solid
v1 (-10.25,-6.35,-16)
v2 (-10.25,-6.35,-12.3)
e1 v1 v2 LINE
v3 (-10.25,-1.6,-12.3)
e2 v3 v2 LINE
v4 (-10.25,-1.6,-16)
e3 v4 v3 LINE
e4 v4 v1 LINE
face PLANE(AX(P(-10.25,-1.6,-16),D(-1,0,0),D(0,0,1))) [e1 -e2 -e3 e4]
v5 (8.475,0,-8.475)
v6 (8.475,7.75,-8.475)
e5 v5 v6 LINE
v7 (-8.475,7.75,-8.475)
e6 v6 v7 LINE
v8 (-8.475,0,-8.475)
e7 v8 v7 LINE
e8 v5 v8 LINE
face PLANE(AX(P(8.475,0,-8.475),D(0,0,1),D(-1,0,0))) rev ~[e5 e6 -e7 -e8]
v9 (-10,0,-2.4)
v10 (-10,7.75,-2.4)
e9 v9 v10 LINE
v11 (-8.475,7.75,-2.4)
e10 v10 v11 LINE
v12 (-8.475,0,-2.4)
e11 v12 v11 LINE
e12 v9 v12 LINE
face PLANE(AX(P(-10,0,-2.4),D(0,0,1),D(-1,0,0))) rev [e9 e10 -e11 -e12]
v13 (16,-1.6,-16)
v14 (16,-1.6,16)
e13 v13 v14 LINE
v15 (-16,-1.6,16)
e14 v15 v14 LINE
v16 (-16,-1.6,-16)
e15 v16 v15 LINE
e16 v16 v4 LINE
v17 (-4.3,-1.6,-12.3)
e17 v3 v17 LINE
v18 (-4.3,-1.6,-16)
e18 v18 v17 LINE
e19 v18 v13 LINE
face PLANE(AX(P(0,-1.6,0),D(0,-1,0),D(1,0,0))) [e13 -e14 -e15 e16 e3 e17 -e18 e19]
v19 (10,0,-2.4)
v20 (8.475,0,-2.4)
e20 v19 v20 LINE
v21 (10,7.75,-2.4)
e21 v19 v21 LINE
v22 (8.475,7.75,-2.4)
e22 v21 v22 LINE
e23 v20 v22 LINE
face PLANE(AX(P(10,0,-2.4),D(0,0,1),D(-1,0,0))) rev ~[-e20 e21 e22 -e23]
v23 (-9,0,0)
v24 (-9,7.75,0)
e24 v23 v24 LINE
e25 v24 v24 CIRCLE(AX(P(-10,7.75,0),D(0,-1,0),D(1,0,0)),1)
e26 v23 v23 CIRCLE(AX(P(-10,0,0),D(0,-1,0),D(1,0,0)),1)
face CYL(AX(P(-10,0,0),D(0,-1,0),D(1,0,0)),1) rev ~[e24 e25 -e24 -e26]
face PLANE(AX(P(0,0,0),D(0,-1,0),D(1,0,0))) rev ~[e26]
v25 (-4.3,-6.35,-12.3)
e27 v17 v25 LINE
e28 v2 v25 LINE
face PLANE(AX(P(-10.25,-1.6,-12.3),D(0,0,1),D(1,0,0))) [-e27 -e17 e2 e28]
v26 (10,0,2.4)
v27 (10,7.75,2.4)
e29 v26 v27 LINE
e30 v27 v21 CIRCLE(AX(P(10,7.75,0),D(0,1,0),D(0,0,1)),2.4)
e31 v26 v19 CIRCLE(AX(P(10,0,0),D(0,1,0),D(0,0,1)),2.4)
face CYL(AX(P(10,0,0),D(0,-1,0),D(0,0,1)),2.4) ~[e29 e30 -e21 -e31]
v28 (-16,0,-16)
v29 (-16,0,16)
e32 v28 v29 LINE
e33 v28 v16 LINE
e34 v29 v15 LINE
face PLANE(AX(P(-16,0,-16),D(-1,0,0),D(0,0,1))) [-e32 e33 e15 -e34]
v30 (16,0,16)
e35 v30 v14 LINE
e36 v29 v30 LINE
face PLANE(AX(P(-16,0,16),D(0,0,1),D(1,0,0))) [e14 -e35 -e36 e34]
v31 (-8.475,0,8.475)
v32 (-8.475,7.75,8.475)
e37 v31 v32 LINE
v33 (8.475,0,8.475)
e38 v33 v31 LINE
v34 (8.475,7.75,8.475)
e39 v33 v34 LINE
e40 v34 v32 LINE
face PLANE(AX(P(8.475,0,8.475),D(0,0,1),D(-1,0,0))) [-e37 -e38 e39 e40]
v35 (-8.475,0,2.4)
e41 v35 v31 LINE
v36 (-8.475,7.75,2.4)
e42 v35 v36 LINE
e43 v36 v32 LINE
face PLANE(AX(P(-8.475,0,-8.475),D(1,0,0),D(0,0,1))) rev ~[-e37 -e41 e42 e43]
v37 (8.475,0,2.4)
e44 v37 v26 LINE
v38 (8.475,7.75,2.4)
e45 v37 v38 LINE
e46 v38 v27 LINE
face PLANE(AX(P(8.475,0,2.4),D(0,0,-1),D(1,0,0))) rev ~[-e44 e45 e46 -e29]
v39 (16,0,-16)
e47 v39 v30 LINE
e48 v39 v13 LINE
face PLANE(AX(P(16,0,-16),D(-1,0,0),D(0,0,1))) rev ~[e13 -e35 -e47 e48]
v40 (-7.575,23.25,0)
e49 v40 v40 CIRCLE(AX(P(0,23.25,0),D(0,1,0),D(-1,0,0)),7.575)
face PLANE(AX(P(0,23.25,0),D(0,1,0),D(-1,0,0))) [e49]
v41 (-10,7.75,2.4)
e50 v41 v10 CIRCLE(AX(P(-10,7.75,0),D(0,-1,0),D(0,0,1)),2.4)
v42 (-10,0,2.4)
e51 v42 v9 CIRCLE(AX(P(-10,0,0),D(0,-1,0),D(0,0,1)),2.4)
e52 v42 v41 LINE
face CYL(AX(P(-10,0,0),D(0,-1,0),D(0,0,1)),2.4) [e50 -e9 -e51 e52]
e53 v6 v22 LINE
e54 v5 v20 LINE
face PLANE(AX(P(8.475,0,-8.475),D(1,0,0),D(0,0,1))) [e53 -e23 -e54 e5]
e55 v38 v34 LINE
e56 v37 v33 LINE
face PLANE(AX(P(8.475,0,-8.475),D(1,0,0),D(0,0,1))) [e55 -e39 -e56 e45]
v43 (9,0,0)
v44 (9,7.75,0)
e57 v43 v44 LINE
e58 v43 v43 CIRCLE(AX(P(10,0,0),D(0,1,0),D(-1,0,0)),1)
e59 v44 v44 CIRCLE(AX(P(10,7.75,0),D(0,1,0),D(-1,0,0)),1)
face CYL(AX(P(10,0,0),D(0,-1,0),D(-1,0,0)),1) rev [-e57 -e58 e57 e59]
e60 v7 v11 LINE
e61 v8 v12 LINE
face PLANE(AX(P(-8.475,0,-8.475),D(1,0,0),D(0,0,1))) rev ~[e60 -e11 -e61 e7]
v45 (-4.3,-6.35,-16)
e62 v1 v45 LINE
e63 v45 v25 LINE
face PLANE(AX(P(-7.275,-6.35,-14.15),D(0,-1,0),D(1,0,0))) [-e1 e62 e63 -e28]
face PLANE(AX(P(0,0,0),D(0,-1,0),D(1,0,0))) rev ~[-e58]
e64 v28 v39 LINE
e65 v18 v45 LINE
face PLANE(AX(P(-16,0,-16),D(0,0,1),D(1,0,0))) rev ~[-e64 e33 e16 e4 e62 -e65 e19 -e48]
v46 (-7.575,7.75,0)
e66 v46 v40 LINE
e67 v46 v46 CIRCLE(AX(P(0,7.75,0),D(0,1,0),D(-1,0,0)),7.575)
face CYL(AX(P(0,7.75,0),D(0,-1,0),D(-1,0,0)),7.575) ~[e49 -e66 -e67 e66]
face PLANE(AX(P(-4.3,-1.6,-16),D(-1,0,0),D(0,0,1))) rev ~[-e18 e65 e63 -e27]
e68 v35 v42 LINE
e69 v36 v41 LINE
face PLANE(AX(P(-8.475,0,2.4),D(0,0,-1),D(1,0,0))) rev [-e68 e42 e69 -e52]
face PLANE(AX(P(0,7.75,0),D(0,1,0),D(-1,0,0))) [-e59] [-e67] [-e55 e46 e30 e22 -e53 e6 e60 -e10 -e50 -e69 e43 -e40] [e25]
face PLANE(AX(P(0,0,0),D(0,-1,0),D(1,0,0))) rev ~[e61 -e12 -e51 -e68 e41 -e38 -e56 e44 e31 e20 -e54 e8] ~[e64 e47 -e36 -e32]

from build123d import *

# Parameters (mm, degrees)
F0_W     = 32
F0_H     = 32
F1_DEPTH = 1.6
F2_W     = 5.95
F2_H     = 3.7
F3_DEPTH = 4.75
F4_W     = 16.95
F4_H     = 16.95
F5_DEPTH = 7.75
F6_R     = 7.575
F7_DEPTH = 15.5
F8_R     = 1
F9_DEPTH = 7.75


# Not quite as in the source:
# - a pattern or mirror of a feature is missing from the dataset's text; its kind, count and spacing are read off the source's solid


with BuildPart() as f1:
    # F0 (on Front) → F1 (new body)
    with BuildSketch(Plane.XZ):
        Rectangle(F0_W, F0_H)
    extrude(amount=F1_DEPTH)

    # F2 (on face) → F3 (join)
    with BuildSketch(Plane.XZ.offset(1.6)):
        with Locations((-7.275, -14.15)):
            Rectangle(F2_W, F2_H)
    extrude(amount=F3_DEPTH)

    # F4 (on face) → F5 (join)
    with BuildSketch(Plane(origin=(0, 0, 0), x_dir=(-1, 0, 0), z_dir=(0, 1, 0))):
        Rectangle(F4_W, F4_H)
    extrude(amount=F5_DEPTH)

    # F6 (on face) → F7 (join)
    with BuildSketch(Plane(origin=(0, 7.75, 0), x_dir=(-1, 0, 0), z_dir=(0, 1, 0))):
        Circle(F6_R)
    extrude(amount=F7_DEPTH)

    # F8 (on face) → F9 (join)
    with BuildSketch(Plane(origin=(0, 0, 0), x_dir=(-1, 0, 0), z_dir=(0, 1, 0))):
        with BuildLine():
            Line((-8.475, 2.4), (-10, 2.4))
            ThreePointArc((-10, 2.4), (-12.4, 0), (-10, -2.4))
            Line((-10, -2.4), (-8.475, -2.4))
            Line((-8.475, -2.4), (-8.475, 2.4))
        make_face()
        with Locations((-10, 0)):
            Circle(F8_R, mode=Mode.SUBTRACT)
    f9 = extrude(amount=F9_DEPTH)

    # F9_copies: F9 across plane
    add(f9.mirror(Plane(origin=(0, 0, 0), x_dir=(0, 0, -1), z_dir=(-1, 0, 0))))


solid = f1.part
